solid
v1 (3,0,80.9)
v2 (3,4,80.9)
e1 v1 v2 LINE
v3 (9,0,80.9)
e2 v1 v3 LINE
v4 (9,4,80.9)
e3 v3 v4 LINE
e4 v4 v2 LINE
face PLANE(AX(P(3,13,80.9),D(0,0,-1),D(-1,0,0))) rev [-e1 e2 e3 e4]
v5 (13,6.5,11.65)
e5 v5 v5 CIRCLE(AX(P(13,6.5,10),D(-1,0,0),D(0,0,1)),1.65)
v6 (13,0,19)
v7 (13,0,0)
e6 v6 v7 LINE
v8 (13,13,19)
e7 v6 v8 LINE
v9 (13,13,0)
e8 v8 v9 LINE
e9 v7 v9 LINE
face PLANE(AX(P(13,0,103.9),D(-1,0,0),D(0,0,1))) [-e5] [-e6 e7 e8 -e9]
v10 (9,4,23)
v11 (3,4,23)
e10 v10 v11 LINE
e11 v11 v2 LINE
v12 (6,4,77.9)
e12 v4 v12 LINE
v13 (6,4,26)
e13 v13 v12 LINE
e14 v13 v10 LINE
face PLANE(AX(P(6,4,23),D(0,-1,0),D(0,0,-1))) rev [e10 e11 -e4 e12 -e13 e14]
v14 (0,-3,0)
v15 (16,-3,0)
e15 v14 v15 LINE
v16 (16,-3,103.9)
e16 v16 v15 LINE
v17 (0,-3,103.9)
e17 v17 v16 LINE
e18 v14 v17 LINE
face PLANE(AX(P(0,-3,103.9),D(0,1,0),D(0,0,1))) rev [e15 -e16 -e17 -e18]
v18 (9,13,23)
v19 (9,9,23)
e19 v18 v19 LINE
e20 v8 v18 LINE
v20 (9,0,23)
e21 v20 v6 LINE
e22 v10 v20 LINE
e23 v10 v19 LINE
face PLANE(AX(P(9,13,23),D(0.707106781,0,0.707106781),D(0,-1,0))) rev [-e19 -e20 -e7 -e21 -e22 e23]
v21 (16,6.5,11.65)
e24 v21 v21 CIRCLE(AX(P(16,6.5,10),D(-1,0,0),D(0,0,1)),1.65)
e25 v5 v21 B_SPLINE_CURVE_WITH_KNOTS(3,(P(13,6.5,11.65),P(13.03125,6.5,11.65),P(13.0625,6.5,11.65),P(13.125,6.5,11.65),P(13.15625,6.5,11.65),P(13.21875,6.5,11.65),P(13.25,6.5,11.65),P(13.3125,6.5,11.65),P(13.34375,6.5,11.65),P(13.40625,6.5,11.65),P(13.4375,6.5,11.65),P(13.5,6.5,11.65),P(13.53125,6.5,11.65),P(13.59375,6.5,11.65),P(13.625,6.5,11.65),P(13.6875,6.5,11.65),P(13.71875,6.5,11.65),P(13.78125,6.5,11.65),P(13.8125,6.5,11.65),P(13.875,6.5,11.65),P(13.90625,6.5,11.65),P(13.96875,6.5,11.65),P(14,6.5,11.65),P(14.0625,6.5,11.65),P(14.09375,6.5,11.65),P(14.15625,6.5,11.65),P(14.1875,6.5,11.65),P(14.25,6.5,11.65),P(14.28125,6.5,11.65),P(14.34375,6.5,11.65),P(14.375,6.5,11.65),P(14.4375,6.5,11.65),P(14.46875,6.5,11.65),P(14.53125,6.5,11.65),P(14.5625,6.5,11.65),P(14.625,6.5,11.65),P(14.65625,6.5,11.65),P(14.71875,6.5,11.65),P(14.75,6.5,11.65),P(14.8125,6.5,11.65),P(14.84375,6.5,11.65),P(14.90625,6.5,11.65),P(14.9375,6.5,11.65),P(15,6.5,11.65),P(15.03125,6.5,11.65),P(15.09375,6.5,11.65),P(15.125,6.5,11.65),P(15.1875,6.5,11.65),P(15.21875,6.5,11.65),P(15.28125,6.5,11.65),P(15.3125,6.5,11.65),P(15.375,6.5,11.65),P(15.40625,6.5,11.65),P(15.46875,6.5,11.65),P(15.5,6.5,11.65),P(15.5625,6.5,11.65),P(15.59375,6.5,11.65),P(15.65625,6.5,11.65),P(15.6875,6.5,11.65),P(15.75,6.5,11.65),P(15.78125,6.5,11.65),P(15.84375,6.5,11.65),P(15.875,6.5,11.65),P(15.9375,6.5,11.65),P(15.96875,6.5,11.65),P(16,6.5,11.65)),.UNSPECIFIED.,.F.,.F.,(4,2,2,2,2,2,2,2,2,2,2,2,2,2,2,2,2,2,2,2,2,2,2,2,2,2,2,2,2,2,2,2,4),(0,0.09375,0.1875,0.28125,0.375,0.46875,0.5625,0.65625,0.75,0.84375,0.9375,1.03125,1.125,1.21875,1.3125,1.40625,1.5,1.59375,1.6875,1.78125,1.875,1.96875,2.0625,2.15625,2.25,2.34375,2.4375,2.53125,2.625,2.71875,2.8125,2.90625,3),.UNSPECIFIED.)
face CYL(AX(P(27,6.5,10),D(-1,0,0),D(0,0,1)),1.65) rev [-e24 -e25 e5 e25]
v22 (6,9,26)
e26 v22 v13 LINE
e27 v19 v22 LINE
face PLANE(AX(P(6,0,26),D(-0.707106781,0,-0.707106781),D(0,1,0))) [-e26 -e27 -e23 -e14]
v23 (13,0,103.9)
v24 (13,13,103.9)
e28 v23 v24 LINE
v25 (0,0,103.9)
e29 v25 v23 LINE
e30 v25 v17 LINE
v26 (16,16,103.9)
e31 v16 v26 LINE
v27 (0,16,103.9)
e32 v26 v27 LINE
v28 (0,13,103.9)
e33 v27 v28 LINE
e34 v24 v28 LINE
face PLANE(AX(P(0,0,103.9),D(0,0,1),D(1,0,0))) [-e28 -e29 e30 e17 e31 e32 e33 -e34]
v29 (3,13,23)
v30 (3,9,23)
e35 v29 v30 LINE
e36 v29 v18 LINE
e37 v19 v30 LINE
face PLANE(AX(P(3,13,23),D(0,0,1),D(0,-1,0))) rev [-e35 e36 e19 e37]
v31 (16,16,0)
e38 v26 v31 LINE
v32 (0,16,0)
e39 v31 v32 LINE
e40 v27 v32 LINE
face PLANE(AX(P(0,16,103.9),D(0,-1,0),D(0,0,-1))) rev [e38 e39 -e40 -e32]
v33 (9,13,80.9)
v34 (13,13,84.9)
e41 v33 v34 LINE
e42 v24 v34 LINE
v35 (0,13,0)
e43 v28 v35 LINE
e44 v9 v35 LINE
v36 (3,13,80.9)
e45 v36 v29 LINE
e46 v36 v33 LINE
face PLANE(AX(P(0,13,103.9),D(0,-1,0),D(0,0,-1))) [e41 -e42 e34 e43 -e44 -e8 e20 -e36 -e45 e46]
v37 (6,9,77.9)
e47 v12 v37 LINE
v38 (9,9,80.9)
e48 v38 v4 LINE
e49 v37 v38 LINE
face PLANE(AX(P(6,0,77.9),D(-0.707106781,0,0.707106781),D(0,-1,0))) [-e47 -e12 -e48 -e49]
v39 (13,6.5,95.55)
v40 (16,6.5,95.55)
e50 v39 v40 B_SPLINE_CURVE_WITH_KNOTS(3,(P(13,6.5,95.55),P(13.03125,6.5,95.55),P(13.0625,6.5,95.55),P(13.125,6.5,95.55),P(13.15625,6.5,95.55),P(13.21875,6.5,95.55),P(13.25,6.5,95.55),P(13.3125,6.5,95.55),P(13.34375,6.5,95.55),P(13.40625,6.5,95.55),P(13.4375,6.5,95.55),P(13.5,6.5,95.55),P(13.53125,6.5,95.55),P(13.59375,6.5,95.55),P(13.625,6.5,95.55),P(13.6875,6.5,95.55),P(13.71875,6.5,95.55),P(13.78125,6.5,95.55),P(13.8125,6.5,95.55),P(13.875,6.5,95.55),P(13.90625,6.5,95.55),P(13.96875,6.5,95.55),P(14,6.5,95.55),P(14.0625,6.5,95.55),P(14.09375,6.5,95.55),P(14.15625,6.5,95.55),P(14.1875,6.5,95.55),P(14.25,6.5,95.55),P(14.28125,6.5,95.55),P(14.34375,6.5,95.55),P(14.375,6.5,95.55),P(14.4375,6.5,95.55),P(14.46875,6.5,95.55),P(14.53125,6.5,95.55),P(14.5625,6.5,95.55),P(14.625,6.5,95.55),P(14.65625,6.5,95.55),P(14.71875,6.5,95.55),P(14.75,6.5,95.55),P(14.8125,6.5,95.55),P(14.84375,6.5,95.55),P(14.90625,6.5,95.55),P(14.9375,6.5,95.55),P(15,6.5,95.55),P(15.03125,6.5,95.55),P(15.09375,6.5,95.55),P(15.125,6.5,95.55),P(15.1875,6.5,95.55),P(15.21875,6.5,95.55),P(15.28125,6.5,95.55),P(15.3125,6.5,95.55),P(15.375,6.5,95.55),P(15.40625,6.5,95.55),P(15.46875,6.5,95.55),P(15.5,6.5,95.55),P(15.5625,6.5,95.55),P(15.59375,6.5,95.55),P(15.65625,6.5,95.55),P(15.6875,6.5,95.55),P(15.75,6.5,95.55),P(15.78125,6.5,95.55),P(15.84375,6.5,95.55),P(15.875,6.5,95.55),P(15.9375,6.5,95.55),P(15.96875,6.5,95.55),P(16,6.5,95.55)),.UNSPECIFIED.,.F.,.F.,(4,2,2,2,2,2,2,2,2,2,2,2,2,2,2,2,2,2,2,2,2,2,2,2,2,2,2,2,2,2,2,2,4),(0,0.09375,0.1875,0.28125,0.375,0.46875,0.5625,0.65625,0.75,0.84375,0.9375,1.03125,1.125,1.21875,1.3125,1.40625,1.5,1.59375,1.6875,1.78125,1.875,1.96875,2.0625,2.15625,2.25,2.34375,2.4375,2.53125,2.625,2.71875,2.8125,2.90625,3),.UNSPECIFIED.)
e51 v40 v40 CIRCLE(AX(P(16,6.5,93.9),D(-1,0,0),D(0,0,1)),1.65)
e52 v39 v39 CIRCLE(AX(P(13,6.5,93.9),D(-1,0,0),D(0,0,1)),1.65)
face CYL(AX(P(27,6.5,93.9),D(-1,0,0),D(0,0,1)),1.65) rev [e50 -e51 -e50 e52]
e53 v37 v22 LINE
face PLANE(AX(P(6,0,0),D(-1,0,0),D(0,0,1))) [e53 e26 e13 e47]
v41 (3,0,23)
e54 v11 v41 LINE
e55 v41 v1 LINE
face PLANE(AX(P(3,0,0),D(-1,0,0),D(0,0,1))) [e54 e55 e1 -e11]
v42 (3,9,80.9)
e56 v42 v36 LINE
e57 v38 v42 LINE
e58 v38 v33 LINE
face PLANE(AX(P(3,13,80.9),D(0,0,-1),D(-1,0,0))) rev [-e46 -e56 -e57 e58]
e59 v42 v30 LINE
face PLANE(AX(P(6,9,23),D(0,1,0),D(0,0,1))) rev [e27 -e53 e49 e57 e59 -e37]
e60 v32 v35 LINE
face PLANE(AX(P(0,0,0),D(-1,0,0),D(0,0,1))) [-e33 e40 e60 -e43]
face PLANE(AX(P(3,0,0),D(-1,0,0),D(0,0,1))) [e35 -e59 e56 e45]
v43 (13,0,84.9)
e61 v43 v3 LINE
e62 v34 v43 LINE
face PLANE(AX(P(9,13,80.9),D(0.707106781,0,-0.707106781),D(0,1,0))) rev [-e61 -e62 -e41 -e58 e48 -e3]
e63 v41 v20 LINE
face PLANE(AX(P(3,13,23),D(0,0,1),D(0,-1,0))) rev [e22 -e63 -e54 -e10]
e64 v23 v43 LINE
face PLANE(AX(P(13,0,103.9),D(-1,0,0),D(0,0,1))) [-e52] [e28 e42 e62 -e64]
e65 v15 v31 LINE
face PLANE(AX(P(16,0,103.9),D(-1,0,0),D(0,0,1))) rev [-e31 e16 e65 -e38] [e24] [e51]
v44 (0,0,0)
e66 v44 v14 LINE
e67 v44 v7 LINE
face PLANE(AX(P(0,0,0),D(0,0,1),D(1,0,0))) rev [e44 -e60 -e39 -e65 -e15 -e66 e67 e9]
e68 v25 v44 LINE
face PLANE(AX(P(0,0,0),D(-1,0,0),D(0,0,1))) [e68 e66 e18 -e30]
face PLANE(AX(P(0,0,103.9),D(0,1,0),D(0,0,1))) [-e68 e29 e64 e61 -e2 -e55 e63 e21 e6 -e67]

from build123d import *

# Parameters (mm, degrees)
SKETCH_1_W          = 19
SKETCH_1_H          = 19
SKETCH_1_W_2        = 13
SKETCH_1_H_2        = 13
EXTRUDE_1_DEPTH     = 103.9
SKETCH_2_R          = 1.65
CUT_EXTRUDE_1_DEPTH = 30
SKETCH_3_W          = 116.915177823
SKETCH_3_H          = 46.219516436
CUT_EXTRUDE_2_DEPTH = 3
SKETCH_4_W          = 5
SKETCH_4_H          = 13
EXTRUDE_1_2_DEPTH   = 10
SKETCH_5_W          = 47.9
SKETCH_5_H          = 5
EXTRUDE_2_DEPTH     = 10
SKETCH_6_W          = 57.9
SKETCH_6_H          = 13
EXTRUDE_3_DEPTH     = 10
SKETCH_8_W          = 57.9
SKETCH_8_H          = 5
CUT_EXTRUDE_3_DEPTH = 3
CHAMFER_1_SIZE      = 3
CHAMFER_2_SIZE      = 4


with BuildPart() as part:
    # 草图1 → Extrude 1 (new body)
    with BuildSketch(Plane.XY):
        with Locations((6.5, 6.5)):
            Rectangle(SKETCH_1_W, SKETCH_1_H)
        with Locations((6.5, 6.5)):
            Rectangle(SKETCH_1_W_2, SKETCH_1_H_2, mode=Mode.SUBTRACT)
    extrude(amount=EXTRUDE_1_DEPTH)

    # 草图2 → 切除-拉伸1 (cut)
    with BuildSketch(Plane.ZY.offset(3)):
        with Locations((10, 6.5)):
            Circle(SKETCH_2_R)
        with Locations((93.9, 6.5)):
            Circle(SKETCH_2_R)
    extrude(amount=-CUT_EXTRUDE_1_DEPTH, mode=Mode.SUBTRACT)

    # 草图3 → 切除-拉伸2 (cut)
    with BuildSketch(Plane.ZY.offset(3)):
        with Locations((53.162237228, 0.202739406)):
            Rectangle(SKETCH_3_W, SKETCH_3_H)
    extrude(amount=-CUT_EXTRUDE_2_DEPTH, mode=Mode.SUBTRACT)

    # 草图4 → Extrude 1 2 (add)
    with BuildSketch(Plane.ZY.offset(-13)):
        with Locations((25.5, 6.5)):
            Rectangle(SKETCH_4_W, SKETCH_4_H)
        with Locations((78.4, 6.5)):
            Rectangle(SKETCH_4_W, SKETCH_4_H)
    extrude(amount=EXTRUDE_1_2_DEPTH)

    # 草图5 → 凸台-拉伸2 (add)
    with BuildSketch(Plane.ZY.offset(-13)):
        with Locations((51.95, 6.5)):
            Rectangle(SKETCH_5_W, SKETCH_5_H)
    extrude(amount=EXTRUDE_2_DEPTH)

    # 草图6 → 凸台-拉伸3 (add)
    with BuildSketch(Plane.ZY.offset(-13)):
        with Locations((51.95, 6.5)):
            Rectangle(SKETCH_6_W, SKETCH_6_H)
    extrude(amount=EXTRUDE_3_DEPTH)

    # 草图8 → 切除-拉伸3 (cut)
    with BuildSketch(Plane.ZY.offset(-3)):
        with Locations((51.95, 6.5)):
            Rectangle(SKETCH_8_W, SKETCH_8_H)
    extrude(amount=-CUT_EXTRUDE_3_DEPTH, mode=Mode.SUBTRACT)

    # 倒角1
    chamfer_1_edges = [part.edges().sort_by_distance(p)[0] for p in [
        (6, 6.5, 23),
        (6, 6.5, 80.9),
    ]]
    chamfer(chamfer_1_edges, length=CHAMFER_1_SIZE)

    # 倒角2
    chamfer_2_edges = [part.edges().sort_by_distance(p)[0] for p in [
        (13, 6.5, 23),
        (13, 6.5, 80.9),
    ]]
    chamfer(chamfer_2_edges, length=CHAMFER_2_SIZE - 0.0001)  # a hair under: the kernel refuses the full size


solid = part.part
